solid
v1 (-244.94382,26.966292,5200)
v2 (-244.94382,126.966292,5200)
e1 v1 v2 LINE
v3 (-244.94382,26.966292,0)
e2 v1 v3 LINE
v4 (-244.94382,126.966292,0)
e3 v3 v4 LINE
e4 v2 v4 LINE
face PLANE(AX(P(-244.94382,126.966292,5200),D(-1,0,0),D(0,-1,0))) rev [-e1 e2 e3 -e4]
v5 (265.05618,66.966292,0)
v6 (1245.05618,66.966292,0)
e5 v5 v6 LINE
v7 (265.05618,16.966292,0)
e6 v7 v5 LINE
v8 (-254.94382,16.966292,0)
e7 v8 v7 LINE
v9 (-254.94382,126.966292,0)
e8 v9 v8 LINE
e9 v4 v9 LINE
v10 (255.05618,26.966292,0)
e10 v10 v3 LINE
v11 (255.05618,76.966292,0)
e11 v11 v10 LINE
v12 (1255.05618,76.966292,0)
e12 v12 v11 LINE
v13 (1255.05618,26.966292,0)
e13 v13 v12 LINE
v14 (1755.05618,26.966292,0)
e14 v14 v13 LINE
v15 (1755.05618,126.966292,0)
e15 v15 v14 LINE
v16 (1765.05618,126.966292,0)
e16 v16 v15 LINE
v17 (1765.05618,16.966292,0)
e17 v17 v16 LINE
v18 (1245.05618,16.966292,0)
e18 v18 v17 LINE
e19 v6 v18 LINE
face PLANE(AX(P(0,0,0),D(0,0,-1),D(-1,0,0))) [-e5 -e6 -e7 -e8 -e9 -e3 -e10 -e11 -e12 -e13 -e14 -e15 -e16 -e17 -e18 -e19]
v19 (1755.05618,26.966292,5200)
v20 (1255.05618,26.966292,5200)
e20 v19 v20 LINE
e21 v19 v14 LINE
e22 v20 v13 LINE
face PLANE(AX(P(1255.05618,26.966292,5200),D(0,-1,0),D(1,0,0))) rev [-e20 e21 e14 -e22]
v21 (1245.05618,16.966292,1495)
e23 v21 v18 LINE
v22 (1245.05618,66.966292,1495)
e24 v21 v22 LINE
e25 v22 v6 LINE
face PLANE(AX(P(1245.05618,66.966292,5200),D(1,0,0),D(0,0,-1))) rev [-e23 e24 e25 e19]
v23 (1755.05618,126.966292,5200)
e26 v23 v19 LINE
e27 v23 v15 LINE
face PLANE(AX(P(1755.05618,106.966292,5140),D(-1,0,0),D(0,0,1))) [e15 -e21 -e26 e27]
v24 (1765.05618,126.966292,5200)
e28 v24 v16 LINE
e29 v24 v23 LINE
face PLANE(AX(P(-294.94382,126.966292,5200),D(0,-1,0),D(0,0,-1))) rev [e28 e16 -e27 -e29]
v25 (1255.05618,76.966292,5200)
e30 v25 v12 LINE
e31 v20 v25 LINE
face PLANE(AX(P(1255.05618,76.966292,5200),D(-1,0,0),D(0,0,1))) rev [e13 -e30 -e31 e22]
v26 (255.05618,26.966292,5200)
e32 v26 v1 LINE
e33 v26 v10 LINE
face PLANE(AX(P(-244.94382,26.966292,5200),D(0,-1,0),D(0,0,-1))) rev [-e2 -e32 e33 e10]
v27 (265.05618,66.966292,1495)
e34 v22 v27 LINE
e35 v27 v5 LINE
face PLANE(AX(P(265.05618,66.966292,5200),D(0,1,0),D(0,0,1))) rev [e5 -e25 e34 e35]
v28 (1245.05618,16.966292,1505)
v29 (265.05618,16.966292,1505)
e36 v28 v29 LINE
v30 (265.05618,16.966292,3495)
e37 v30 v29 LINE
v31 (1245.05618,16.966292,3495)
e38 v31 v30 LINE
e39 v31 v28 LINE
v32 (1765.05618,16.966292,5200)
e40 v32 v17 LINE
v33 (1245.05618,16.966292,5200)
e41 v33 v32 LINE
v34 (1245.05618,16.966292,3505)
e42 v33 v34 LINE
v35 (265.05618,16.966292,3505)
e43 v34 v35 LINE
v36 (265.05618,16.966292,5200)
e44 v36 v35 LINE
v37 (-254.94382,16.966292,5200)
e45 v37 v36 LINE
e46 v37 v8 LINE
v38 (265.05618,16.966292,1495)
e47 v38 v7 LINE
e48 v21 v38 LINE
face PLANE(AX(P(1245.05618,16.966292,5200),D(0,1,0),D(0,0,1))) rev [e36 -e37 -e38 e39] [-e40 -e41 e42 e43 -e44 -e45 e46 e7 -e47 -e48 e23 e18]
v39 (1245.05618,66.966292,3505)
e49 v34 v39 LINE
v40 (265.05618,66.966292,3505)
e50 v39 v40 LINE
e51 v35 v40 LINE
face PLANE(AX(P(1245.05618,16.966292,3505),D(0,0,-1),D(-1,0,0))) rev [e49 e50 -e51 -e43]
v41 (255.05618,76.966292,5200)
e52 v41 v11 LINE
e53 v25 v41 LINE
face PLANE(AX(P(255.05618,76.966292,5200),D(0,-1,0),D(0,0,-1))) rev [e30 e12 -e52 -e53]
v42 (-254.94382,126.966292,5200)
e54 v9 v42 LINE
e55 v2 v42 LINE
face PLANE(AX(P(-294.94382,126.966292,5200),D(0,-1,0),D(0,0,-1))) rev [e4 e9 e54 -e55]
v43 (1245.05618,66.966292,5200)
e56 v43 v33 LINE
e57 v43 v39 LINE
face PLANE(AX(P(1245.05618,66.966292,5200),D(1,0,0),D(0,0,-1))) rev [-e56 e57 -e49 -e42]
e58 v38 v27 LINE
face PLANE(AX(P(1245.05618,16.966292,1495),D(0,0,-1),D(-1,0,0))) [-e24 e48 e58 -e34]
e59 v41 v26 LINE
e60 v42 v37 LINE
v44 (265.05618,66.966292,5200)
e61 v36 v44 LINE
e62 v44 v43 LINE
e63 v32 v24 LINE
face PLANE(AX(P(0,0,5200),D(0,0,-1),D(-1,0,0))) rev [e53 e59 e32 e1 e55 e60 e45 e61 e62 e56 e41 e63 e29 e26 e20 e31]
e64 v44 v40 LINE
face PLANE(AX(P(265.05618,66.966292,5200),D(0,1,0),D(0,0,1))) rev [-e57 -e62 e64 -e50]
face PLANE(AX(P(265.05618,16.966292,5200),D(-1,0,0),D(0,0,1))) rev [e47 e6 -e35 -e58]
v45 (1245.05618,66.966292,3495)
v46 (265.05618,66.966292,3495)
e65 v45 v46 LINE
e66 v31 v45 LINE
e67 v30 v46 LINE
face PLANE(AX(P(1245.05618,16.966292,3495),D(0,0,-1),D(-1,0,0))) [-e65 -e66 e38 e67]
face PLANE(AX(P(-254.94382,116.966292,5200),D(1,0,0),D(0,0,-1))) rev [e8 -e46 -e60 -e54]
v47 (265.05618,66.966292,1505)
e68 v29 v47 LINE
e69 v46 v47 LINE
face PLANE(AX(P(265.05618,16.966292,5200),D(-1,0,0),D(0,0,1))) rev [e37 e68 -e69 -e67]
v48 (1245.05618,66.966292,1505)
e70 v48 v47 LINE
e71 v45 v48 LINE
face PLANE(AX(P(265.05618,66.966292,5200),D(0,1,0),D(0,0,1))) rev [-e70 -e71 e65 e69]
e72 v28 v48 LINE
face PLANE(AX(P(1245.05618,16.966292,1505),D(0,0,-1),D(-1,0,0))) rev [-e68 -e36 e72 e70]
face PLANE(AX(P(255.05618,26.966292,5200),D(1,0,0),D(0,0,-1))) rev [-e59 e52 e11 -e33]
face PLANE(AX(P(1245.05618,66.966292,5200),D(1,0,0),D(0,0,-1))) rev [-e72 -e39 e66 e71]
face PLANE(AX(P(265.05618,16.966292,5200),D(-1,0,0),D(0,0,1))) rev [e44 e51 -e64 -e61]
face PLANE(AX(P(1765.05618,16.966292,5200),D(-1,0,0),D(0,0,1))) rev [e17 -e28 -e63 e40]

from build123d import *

# Parameters (mm, degrees)
BOSS_EXTRUDE1_DEPTH = 5200
RIB1_REACH          = 5507.482
SKETCH2_WALLS_W     = 11992.963229826
SKETCH2_WALLS_H     = 10
SKETCH3_W           = 70
SKETCH3_H           = 5
BOSS_EXTRUDE2_DEPTH = 35
SKETCH4_W           = 70
SKETCH4_H           = 5
BOSS_EXTRUDE3_DEPTH = 35
SKETCH6_W           = 60
SKETCH6_H           = 20
BOSS_EXTRUDE5_DEPTH = 2000
SKETCH7_W           = 10
SKETCH7_H           = 39.988397119
SKETCH7_W_2         = 9.978776679
SKETCH7_H_2         = 40
CUT_EXTRUDE1_DEPTH  = 5518.420337809
SKETCH8_W           = 10.659440655
SKETCH8_H           = 50.244619817
SKETCH8_W_2         = 36.147201271
SKETCH8_H_2         = 63.106865185
CUT_EXTRUDE2_DEPTH  = 5518.420337809
SKETCH9_W           = 81.57273963
SKETCH9_H           = 67.362460328
SKETCH9_W_2         = 80.643055667
SKETCH9_H_2         = 59.078828037
CUT_EXTRUDE3_DEPTH  = 5518.420337809
SPLIT1_START        = 106.966292135
SPLIT1_OUTLINE_W    = 2000
SPLIT1_OUTLINE_H    = 60
SPLIT1_DEPTH        = 20


# Read off the part's stored shape, not the designer's step: Split1
with BuildPart() as part:
    # Sketch1 → Boss-Extrude1 (new body)
    with BuildSketch(Plane.XY):
        Polygon((-294.943820225, 76.966292135), (-294.943820225, 126.966292135), (-244.943820225, 126.966292135), (-244.943820225, 26.966292135), (255.056179775, 26.966292135), (255.056179775, 76.966292135), (1255.056179775, 76.966292135), (1255.056179775, 26.966292135), (1755.056179775, 26.966292135), (1755.056179775, 126.966292135), (1805.056179775, 126.966292135), (1805.056179775, 76.966292135), (1795.056179775, 76.966292135), (1795.056179775, 116.966292135), (1765.056179775, 116.966292135), (1765.056179775, 16.966292135), (1245.056179775, 16.966292135), (1245.056179775, 66.966292135), (265.056179775, 66.966292135), (265.056179775, 16.966292135), (-254.943820225, 16.966292135), (-254.943820225, 116.966292135), (-284.943820225, 116.966292135), (-284.943820225, 76.966292135), align=None)
    extrude(amount=BOSS_EXTRUDE1_DEPTH)

    # Sketch2 walls → Rib1 (add, up to next)
    with BuildSketch(Plane.XZ.offset(-16.966292135), mode=Mode.PRIVATE) as rib1_sk1:
        with Locations((755.056179775, 1500)):
            Rectangle(SKETCH2_WALLS_W, SKETCH2_WALLS_H)
    rib1_tool1 = extrude(rib1_sk1.sketch, amount=-RIB1_REACH, mode=Mode.PRIVATE) - part.part
    # Sketch2 walls → Rib1 (add, up to next)
    with BuildSketch(Plane.XZ.offset(-16.966292135), mode=Mode.PRIVATE) as rib1_sk2:
        with Locations((755.056179775, 3500)):
            Rectangle(SKETCH2_WALLS_W, SKETCH2_WALLS_H)
    rib1_tool2 = extrude(rib1_sk2.sketch, amount=-RIB1_REACH, mode=Mode.PRIVATE) - part.part
    add(rib1_tool1.solids().sort_by_distance((755.056179775, 16.966292135, 1500))[0])
    add(rib1_tool2.solids().sort_by_distance((755.056179775, 16.966292135, 3500))[0])

    # Sketch3 → Boss-Extrude2 (add)
    with BuildSketch(Plane(origin=(1805.056179775, 0, 0), x_dir=(0, 0, -1), z_dir=(1, 0, 0))):
        with Locations((-35, 124.466292135)):
            Rectangle(SKETCH3_W, SKETCH3_H)
        with Locations((-5165, 124.466292135)):
            Rectangle(SKETCH3_W, SKETCH3_H)
    extrude(amount=BOSS_EXTRUDE2_DEPTH)

    # Sketch4 → Boss-Extrude3 (add)
    with BuildSketch(Plane.ZY.offset(294.943820225)):
        with Locations((35, 124.466292135)):
            Rectangle(SKETCH4_W, SKETCH4_H)
        with Locations((5165, 124.466292135)):
            Rectangle(SKETCH4_W, SKETCH4_H)
    extrude(amount=BOSS_EXTRUDE3_DEPTH)

    # Sketch6 → Boss-Extrude5 (add)
    with BuildSketch(Plane(origin=(-244.943820225, 0, 0), x_dir=(0, 0, -1), z_dir=(1, 0, 0))):
        with Locations((-5170, 116.966292135)):
            Rectangle(SKETCH6_W, SKETCH6_H)
    extrude(amount=BOSS_EXTRUDE5_DEPTH)

    # Sketch7 → Cut-Extrude1 (cut, through all)
    with BuildSketch(Plane.XY.offset(5200)):
        with Locations((-289.943820225, 96.972093575)):
            Rectangle(SKETCH7_W, SKETCH7_H)
        with Locations((1800.045568115, 96.966292135)):
            Rectangle(SKETCH7_W_2, SKETCH7_H_2)
    extrude(amount=-CUT_EXTRUDE1_DEPTH, mode=Mode.SUBTRACT)


with BuildPart() as cut_extrude1_piece_1:
    # of the separate pieces the step leaves, piece 1, a body of its own (cut_extrude1_pieces)
    add(part.part.solids().sort_by_distance((-294.943820225, 116.966292135, 0))[0])


with BuildPart() as cut_extrude1_piece_2:
    # of the separate pieces the step leaves, piece 2, a body of its own (cut_extrude1_pieces)
    add(part.part.solids().sort_by_distance((-294.943820225, 76.966292135, 0))[0])


with BuildPart() as cut_extrude2_tool:
    # Sketch8 → Cut-Extrude2 (new, through all)
    with BuildSketch(Plane.XY.offset(5200)):
        with Locations((1805.361416771, 91.843982227)):
            Rectangle(SKETCH8_W, SKETCH8_H)
        with Locations((-291.630819883, 60.290549635)):
            Rectangle(SKETCH8_W_2, SKETCH8_H_2)
    extrude(amount=-CUT_EXTRUDE2_DEPTH)


with BuildPart() as cut_extrude1_piece_1_1:
    add(cut_extrude1_piece_1.part)

    # Cut-Extrude2: cut by cut_extrude2_tool
    add(cut_extrude2_tool.part, mode=Mode.SUBTRACT)

    # Sketch9 → Cut-Extrude3 (cut, through all)
    with BuildSketch(Plane(origin=(0, 0, 0), x_dir=(-1, 0, 0), z_dir=(0, 0, -1))):
        with Locations((295.73019004, 130.148013634)):
            Rectangle(SKETCH9_W, SKETCH9_H)
        with Locations((-1805.377707609, 122.845657173)):
            Rectangle(SKETCH9_W_2, SKETCH9_H_2)
    extrude(amount=-CUT_EXTRUDE3_DEPTH, mode=Mode.SUBTRACT)

    # Split1 outline → Split1 (cut)
    with BuildSketch(Plane(origin=(0, 0, 0), x_dir=(1, 0, 0), z_dir=(0, 1, 0)).offset(SPLIT1_START)):
        with Locations((755.056179775, -5170)):
            Rectangle(SPLIT1_OUTLINE_W, SPLIT1_OUTLINE_H)
    extrude(amount=SPLIT1_DEPTH, mode=Mode.SUBTRACT)


with BuildPart() as cut_extrude1_piece_2_1:
    add(cut_extrude1_piece_2.part)

    # Cut-Extrude2: cut by cut_extrude2_tool
    add(cut_extrude2_tool.part, mode=Mode.SUBTRACT)


solid = cut_extrude1_piece_1_1.part
